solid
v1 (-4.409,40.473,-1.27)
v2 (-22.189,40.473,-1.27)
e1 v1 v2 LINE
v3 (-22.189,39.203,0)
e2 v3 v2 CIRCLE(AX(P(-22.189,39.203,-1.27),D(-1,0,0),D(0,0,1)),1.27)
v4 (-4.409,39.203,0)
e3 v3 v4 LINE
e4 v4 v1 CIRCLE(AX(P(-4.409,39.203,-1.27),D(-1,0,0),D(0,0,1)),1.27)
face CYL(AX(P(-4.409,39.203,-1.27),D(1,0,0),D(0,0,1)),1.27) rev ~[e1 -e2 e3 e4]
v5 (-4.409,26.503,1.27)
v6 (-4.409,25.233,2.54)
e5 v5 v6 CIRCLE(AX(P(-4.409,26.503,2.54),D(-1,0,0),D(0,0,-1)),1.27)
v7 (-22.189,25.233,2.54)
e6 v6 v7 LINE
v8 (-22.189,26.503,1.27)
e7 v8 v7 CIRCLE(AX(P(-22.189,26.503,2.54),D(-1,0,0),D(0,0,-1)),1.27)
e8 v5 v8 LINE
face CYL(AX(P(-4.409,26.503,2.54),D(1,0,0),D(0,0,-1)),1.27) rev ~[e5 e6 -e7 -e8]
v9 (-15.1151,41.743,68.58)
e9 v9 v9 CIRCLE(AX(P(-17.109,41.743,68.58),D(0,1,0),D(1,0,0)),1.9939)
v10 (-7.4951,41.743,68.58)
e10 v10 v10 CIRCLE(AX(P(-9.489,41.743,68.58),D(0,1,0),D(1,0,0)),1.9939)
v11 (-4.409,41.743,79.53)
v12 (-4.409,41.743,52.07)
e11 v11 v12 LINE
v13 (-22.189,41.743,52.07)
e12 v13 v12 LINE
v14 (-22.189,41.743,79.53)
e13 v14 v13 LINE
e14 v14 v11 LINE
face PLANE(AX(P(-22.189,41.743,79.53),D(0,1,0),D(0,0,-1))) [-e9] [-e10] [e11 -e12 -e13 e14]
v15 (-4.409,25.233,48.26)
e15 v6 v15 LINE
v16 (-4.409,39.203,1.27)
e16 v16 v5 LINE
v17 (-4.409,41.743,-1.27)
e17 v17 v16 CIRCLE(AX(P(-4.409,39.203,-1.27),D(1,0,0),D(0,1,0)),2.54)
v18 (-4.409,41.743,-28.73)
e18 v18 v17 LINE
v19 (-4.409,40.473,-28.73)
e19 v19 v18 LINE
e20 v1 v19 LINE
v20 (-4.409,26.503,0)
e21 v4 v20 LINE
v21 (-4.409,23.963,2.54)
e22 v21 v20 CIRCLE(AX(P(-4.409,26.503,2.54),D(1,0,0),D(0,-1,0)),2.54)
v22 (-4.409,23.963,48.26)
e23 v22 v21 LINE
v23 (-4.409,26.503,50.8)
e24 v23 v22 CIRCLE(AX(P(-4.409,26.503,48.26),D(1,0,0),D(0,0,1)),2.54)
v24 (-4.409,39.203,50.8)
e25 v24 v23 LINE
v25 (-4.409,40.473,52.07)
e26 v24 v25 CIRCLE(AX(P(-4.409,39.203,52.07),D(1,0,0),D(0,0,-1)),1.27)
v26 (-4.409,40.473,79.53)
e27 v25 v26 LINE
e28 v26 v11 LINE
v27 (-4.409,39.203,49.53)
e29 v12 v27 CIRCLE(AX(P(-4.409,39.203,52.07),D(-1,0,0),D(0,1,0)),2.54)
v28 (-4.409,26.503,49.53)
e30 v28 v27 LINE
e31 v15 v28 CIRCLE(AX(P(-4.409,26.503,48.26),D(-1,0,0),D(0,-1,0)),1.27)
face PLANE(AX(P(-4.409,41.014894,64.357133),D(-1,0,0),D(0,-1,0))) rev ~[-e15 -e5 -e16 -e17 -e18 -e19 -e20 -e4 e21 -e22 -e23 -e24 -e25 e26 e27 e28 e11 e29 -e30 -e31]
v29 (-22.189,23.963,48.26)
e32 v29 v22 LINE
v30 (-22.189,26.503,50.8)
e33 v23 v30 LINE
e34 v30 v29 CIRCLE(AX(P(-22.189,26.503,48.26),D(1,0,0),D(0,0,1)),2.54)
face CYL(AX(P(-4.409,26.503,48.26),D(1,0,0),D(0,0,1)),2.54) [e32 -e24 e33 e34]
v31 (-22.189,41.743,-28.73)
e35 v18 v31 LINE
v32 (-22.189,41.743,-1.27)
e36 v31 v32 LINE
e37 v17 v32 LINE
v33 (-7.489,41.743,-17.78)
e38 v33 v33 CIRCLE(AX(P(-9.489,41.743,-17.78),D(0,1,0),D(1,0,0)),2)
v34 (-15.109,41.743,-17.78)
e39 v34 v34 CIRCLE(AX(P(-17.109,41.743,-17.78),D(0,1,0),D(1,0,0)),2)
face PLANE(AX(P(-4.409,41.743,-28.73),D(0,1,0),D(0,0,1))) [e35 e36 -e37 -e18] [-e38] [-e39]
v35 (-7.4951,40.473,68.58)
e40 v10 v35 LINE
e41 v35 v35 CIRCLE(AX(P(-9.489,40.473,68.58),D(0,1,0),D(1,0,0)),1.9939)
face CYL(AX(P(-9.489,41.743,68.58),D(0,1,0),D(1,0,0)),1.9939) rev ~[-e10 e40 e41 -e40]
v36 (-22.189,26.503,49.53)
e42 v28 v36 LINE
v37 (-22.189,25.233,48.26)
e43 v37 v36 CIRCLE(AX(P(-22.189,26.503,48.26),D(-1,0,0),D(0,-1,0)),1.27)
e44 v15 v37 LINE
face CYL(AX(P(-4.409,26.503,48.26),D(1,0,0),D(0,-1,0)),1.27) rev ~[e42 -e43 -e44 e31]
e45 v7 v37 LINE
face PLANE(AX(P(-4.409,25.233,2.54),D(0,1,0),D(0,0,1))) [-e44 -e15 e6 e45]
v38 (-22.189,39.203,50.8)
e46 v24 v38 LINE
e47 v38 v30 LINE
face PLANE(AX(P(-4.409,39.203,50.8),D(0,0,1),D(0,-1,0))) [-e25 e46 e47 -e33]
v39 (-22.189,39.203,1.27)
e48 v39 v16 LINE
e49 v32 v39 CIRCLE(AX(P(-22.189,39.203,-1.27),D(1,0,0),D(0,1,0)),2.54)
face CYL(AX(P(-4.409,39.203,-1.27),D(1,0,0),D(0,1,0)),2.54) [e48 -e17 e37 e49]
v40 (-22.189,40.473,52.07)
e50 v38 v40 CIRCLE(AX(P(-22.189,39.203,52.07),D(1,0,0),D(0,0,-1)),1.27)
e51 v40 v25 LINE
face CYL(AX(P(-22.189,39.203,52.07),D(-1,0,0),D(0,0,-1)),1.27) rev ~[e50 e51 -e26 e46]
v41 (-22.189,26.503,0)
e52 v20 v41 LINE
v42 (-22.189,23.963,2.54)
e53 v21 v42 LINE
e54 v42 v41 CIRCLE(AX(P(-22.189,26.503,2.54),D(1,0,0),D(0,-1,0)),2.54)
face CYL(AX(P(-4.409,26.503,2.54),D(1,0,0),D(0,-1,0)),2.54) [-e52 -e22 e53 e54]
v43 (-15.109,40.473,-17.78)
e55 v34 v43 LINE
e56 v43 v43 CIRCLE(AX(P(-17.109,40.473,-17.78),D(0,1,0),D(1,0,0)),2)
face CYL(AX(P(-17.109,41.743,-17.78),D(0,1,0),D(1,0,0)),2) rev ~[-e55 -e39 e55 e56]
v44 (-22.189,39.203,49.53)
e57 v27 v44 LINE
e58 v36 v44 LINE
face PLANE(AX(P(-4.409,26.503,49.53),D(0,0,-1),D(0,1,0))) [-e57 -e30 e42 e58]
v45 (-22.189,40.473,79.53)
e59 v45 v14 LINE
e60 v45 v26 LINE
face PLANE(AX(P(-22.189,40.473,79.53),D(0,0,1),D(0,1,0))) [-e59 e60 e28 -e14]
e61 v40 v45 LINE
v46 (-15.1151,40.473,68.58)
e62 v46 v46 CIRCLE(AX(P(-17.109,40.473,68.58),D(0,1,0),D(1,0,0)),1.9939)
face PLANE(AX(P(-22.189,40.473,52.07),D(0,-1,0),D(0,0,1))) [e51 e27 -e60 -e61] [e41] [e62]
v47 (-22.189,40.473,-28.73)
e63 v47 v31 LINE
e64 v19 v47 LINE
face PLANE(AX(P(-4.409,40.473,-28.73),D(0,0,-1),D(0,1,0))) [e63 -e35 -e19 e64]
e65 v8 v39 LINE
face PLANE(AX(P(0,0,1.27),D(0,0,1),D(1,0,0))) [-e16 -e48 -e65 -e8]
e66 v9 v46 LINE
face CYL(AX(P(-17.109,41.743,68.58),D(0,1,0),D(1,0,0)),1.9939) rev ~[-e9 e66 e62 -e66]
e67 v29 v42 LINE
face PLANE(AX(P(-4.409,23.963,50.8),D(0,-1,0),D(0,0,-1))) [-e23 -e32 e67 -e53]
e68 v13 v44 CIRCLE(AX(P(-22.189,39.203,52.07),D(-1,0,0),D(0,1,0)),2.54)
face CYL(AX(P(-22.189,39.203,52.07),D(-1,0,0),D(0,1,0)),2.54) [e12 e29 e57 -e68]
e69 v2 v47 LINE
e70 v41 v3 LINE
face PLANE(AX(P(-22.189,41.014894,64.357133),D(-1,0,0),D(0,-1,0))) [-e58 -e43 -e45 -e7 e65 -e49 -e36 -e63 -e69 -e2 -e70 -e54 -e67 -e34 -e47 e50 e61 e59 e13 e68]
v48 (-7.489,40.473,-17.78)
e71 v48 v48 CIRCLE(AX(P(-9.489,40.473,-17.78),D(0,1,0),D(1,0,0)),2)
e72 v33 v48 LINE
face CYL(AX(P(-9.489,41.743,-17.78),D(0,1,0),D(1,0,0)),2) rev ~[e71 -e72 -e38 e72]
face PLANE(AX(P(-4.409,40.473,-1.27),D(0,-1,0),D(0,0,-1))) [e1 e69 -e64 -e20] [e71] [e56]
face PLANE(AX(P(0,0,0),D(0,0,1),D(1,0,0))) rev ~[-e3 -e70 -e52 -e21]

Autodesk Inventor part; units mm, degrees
ref_plane "YZ Plane" through (0, 0, 0) normal (1, 0, 0) x (0, 1, 0)
ref_plane "XZ Plane" through (0, 0, 0) normal (0, 1, 0) x (-1, 0, 0)
ref_plane "XY Plane" through (0, 0, 0) normal (0, 0, 1) x (1, 0, 0)
sketch "Sketch1" plane through (0, 0, 0) normal (0, 0, 1) x (1, 0, 0)
  line L0 (-22.189, 41.743) -> (-4.409, 41.743)
  line L1 (-4.409, 41.743) -> (-4.409, 23.963)
  line L2 (-4.409, 23.963) -> (-22.189, 23.963)
  line L3 (-22.189, 23.963) -> (-22.189, 41.743)
  point P0 (0, 0)
  dimension "d0" = 17.78
  dimension "d1" = 17.78
extrude "Plate1" add sketch "Sketch1" along normal blind 1.27
sketch "Sketch2" plane through (-4.409, 40.473, 1.27) normal (0, 1, 0) x (-1, 0, 0)
  line L0 (17.78, 0) -> (0, 0)
  line L1 (0, 0) -> (0, -30)
  line L2 (0, -30) -> (17.78, -30)
  line L3 (17.78, -30) -> (17.78, 0)
edge flange "Flange1" height 30 angle 90 thickness 1.27 bend radius 1.27 thickness toward (0, 1, 0) relief straight relief width 1.27 relief depth 0.635 edges at (-13.299, 41.743, 0) wall of the first edge with corners at (-22.189, 40.473, 1.27) (-4.409, 40.473, 1.27) (-4.409, 40.473, -28.73) (-22.189, 40.473, -28.73)
bend "Bend1"
corner "Corner1"
sketch "Sketch4" plane through (-22.189, 41.743, -28.73) normal (0, 1, 0) x (1, 0, 0)
  circle A0 centre (12.7, -10.95) radius 2
  circle A1 centre (5.08, -10.95) radius 2
  line L0 (17.78, 0) -> (17.78, -27.46) projected
  line L1 (0, -27.46) -> (0, 0) projected
  line L2 (0, -27.46) -> (17.78, -27.46) projected
  point P0 (22.189, -28.73)
  dimension "d26" = 4
  dimension "d27" = 4
  dimension "d29" = 5.08
  dimension "d30" = 5.08
  dimension "d31" = 16.51
  dimension "d32" = 16.51
extrude "Extrusion2" cut sketch "Sketch4" against normal blind 2.54
sketch "Sketch5" plane through (-4.409, 25.233, 0) normal (0, -1, 0) x (1, 0, 0)
  line L0 (-17.78, 0) -> (0, 0)
  line L1 (0, 0) -> (0, 50.8)
  line L2 (0, 50.8) -> (-17.78, 50.8)
  line L3 (-17.78, 50.8) -> (-17.78, 0)
edge flange "Flange2" height 50.8 angle 90 thickness 1.27 bend radius 1.27 thickness toward (0, -1, 0) relief straight relief width 1.27 relief depth 0.635 edges at (-13.299, 23.963, 1.27) wall of the first edge with corners at (-22.189, 25.233, 0) (-4.409, 25.233, 0) (-4.409, 25.233, 50.8) (-22.189, 25.233, 50.8)
bend "Bend2"
corner "Corner2"
sketch "Sketch6" plane through (-4.409, 23.963, 49.53) normal (0, 0, 1) x (1, 0, 0)
  line L0 (-17.78, 0) -> (0, 0)
  line L1 (0, 0) -> (0, 15.24)
  line L2 (0, 15.24) -> (-17.78, 15.24)
  line L3 (-17.78, 15.24) -> (-17.78, 0)
edge flange "Flange3" height 15.24 angle 90 thickness 1.27 bend radius 1.27 thickness toward (0, 0, 1) relief straight relief width 1.27 relief depth 0.635 edges at (-13.299, 25.233, 50.8) wall of the first edge with corners at (-22.189, 23.963, 49.53) (-4.409, 23.963, 49.53) (-4.409, 39.203, 49.53) (-22.189, 39.203, 49.53)
bend "Bend3"
corner "Corner3"
sketch "Sketch7" plane through (-22.189, 40.473, 52.07) normal (0, 1, 0) x (-1, 0, 0)
  line L0 (-17.78, 0) -> (0, 0)
  line L1 (0, 0) -> (0, 27.46)
  line L2 (0, 27.46) -> (-17.78, 27.46)
  line L3 (-17.78, 27.46) -> (-17.78, 0)
edge flange "Flange4" height 30 angle 90 thickness 1.27 bend radius 1.27 thickness toward (0, 1, 0) relief straight relief width 1.27 relief depth 0.635 edges at (-13.299, 39.203, 50.8) wall of the first edge with corners at (-4.409, 40.473, 52.07) (-22.189, 40.473, 52.07) (-22.189, 40.473, 79.53) (-4.409, 40.473, 79.53)
bend "Bend4"
corner "Corner4"
sketch "Sketch9" plane through (-22.189, 41.743, 79.53) normal (0, 1, 0) x (1, 0, 0)
  circle A0 centre (5.08, 10.95) radius 1.9939
  circle A1 centre (12.7, 10.95) radius 1.9939
  line L0 (0, 0) -> (0, 27.46) projected
  line L1 (17.78, 27.46) -> (17.78, 0) projected
  point P0 (22.189, 79.53)
  dimension "d69" = 3.9878
  dimension "d70" = 3.9878
  dimension "d71" = 5.08
  dimension "d73" = 16.51
  dimension "d74" = 16.51
  dimension "d79" = 7.62
extrude "Extrusion4" cut sketch "Sketch9" against normal blind 5.08
sketch "Sketch10" plane through (-22.189, 25.233, 2.54) normal (0, 1, 0) x (1, 0, 0)
  point P0 (22.189, 2.54)
equation "\"d3\" = BendReliefWidth"
equation "\"d4\" = BendReliefDepth"
equation "\"d5\" = MinimumRemnant"
equation "\"d6\" = BendRadius"
equation "\"d9\" = BendRadius"
equation "\"d10\" = CornerReliefSize"
equation "\"d11\" = GapSize"
equation "\"d12\" = JacobiRadiusSize"
equation "\"d35\" = BendReliefWidth"
equation "\"d36\" = BendReliefDepth"
equation "\"d37\" = MinimumRemnant"
equation "\"d38\" = BendRadius"
equation "\"d41\" = BendRadius"
equation "\"d42\" = CornerReliefSize"
equation "\"d43\" = GapSize"
equation "\"d44\" = JacobiRadiusSize"
equation "\"d45\" = BendReliefWidth"
equation "\"d46\" = BendReliefDepth"
equation "\"d47\" = MinimumRemnant"
equation "\"d48\" = BendRadius"
equation "\"d51\" = BendRadius"
equation "\"d52\" = CornerReliefSize"
equation "\"d53\" = GapSize"
equation "\"d54\" = JacobiRadiusSize"
equation "\"d55\" = BendReliefWidth"
equation "\"d56\" = BendReliefDepth"
equation "\"d57\" = MinimumRemnant"
equation "\"d58\" = BendRadius"
equation "\"d61\" = BendRadius"
equation "\"d62\" = CornerReliefSize"
equation "\"d63\" = GapSize"
equation "\"d64\" = JacobiRadiusSize"
equation "\"BendRadius\" = Thickness"
equation "\"BendReliefWidth\" = Thickness"
equation "\"BendReliefDepth\" = 0.5 * Thickness"
equation "\"CornerReliefSize\" = 4 * Thickness"
equation "\"MinimumRemnant\" = 2 * Thickness"
equation "\"TransitionRadius\" = BendRadius"
equation "\"JacobiRadiusSize\" = Thickness"
equation "\"GapSize\" = Thickness"
equation "\"d2\" = BendRadius"
equation "\"Thickness\" = 1.27"
properties part number "Hew battery holder"
